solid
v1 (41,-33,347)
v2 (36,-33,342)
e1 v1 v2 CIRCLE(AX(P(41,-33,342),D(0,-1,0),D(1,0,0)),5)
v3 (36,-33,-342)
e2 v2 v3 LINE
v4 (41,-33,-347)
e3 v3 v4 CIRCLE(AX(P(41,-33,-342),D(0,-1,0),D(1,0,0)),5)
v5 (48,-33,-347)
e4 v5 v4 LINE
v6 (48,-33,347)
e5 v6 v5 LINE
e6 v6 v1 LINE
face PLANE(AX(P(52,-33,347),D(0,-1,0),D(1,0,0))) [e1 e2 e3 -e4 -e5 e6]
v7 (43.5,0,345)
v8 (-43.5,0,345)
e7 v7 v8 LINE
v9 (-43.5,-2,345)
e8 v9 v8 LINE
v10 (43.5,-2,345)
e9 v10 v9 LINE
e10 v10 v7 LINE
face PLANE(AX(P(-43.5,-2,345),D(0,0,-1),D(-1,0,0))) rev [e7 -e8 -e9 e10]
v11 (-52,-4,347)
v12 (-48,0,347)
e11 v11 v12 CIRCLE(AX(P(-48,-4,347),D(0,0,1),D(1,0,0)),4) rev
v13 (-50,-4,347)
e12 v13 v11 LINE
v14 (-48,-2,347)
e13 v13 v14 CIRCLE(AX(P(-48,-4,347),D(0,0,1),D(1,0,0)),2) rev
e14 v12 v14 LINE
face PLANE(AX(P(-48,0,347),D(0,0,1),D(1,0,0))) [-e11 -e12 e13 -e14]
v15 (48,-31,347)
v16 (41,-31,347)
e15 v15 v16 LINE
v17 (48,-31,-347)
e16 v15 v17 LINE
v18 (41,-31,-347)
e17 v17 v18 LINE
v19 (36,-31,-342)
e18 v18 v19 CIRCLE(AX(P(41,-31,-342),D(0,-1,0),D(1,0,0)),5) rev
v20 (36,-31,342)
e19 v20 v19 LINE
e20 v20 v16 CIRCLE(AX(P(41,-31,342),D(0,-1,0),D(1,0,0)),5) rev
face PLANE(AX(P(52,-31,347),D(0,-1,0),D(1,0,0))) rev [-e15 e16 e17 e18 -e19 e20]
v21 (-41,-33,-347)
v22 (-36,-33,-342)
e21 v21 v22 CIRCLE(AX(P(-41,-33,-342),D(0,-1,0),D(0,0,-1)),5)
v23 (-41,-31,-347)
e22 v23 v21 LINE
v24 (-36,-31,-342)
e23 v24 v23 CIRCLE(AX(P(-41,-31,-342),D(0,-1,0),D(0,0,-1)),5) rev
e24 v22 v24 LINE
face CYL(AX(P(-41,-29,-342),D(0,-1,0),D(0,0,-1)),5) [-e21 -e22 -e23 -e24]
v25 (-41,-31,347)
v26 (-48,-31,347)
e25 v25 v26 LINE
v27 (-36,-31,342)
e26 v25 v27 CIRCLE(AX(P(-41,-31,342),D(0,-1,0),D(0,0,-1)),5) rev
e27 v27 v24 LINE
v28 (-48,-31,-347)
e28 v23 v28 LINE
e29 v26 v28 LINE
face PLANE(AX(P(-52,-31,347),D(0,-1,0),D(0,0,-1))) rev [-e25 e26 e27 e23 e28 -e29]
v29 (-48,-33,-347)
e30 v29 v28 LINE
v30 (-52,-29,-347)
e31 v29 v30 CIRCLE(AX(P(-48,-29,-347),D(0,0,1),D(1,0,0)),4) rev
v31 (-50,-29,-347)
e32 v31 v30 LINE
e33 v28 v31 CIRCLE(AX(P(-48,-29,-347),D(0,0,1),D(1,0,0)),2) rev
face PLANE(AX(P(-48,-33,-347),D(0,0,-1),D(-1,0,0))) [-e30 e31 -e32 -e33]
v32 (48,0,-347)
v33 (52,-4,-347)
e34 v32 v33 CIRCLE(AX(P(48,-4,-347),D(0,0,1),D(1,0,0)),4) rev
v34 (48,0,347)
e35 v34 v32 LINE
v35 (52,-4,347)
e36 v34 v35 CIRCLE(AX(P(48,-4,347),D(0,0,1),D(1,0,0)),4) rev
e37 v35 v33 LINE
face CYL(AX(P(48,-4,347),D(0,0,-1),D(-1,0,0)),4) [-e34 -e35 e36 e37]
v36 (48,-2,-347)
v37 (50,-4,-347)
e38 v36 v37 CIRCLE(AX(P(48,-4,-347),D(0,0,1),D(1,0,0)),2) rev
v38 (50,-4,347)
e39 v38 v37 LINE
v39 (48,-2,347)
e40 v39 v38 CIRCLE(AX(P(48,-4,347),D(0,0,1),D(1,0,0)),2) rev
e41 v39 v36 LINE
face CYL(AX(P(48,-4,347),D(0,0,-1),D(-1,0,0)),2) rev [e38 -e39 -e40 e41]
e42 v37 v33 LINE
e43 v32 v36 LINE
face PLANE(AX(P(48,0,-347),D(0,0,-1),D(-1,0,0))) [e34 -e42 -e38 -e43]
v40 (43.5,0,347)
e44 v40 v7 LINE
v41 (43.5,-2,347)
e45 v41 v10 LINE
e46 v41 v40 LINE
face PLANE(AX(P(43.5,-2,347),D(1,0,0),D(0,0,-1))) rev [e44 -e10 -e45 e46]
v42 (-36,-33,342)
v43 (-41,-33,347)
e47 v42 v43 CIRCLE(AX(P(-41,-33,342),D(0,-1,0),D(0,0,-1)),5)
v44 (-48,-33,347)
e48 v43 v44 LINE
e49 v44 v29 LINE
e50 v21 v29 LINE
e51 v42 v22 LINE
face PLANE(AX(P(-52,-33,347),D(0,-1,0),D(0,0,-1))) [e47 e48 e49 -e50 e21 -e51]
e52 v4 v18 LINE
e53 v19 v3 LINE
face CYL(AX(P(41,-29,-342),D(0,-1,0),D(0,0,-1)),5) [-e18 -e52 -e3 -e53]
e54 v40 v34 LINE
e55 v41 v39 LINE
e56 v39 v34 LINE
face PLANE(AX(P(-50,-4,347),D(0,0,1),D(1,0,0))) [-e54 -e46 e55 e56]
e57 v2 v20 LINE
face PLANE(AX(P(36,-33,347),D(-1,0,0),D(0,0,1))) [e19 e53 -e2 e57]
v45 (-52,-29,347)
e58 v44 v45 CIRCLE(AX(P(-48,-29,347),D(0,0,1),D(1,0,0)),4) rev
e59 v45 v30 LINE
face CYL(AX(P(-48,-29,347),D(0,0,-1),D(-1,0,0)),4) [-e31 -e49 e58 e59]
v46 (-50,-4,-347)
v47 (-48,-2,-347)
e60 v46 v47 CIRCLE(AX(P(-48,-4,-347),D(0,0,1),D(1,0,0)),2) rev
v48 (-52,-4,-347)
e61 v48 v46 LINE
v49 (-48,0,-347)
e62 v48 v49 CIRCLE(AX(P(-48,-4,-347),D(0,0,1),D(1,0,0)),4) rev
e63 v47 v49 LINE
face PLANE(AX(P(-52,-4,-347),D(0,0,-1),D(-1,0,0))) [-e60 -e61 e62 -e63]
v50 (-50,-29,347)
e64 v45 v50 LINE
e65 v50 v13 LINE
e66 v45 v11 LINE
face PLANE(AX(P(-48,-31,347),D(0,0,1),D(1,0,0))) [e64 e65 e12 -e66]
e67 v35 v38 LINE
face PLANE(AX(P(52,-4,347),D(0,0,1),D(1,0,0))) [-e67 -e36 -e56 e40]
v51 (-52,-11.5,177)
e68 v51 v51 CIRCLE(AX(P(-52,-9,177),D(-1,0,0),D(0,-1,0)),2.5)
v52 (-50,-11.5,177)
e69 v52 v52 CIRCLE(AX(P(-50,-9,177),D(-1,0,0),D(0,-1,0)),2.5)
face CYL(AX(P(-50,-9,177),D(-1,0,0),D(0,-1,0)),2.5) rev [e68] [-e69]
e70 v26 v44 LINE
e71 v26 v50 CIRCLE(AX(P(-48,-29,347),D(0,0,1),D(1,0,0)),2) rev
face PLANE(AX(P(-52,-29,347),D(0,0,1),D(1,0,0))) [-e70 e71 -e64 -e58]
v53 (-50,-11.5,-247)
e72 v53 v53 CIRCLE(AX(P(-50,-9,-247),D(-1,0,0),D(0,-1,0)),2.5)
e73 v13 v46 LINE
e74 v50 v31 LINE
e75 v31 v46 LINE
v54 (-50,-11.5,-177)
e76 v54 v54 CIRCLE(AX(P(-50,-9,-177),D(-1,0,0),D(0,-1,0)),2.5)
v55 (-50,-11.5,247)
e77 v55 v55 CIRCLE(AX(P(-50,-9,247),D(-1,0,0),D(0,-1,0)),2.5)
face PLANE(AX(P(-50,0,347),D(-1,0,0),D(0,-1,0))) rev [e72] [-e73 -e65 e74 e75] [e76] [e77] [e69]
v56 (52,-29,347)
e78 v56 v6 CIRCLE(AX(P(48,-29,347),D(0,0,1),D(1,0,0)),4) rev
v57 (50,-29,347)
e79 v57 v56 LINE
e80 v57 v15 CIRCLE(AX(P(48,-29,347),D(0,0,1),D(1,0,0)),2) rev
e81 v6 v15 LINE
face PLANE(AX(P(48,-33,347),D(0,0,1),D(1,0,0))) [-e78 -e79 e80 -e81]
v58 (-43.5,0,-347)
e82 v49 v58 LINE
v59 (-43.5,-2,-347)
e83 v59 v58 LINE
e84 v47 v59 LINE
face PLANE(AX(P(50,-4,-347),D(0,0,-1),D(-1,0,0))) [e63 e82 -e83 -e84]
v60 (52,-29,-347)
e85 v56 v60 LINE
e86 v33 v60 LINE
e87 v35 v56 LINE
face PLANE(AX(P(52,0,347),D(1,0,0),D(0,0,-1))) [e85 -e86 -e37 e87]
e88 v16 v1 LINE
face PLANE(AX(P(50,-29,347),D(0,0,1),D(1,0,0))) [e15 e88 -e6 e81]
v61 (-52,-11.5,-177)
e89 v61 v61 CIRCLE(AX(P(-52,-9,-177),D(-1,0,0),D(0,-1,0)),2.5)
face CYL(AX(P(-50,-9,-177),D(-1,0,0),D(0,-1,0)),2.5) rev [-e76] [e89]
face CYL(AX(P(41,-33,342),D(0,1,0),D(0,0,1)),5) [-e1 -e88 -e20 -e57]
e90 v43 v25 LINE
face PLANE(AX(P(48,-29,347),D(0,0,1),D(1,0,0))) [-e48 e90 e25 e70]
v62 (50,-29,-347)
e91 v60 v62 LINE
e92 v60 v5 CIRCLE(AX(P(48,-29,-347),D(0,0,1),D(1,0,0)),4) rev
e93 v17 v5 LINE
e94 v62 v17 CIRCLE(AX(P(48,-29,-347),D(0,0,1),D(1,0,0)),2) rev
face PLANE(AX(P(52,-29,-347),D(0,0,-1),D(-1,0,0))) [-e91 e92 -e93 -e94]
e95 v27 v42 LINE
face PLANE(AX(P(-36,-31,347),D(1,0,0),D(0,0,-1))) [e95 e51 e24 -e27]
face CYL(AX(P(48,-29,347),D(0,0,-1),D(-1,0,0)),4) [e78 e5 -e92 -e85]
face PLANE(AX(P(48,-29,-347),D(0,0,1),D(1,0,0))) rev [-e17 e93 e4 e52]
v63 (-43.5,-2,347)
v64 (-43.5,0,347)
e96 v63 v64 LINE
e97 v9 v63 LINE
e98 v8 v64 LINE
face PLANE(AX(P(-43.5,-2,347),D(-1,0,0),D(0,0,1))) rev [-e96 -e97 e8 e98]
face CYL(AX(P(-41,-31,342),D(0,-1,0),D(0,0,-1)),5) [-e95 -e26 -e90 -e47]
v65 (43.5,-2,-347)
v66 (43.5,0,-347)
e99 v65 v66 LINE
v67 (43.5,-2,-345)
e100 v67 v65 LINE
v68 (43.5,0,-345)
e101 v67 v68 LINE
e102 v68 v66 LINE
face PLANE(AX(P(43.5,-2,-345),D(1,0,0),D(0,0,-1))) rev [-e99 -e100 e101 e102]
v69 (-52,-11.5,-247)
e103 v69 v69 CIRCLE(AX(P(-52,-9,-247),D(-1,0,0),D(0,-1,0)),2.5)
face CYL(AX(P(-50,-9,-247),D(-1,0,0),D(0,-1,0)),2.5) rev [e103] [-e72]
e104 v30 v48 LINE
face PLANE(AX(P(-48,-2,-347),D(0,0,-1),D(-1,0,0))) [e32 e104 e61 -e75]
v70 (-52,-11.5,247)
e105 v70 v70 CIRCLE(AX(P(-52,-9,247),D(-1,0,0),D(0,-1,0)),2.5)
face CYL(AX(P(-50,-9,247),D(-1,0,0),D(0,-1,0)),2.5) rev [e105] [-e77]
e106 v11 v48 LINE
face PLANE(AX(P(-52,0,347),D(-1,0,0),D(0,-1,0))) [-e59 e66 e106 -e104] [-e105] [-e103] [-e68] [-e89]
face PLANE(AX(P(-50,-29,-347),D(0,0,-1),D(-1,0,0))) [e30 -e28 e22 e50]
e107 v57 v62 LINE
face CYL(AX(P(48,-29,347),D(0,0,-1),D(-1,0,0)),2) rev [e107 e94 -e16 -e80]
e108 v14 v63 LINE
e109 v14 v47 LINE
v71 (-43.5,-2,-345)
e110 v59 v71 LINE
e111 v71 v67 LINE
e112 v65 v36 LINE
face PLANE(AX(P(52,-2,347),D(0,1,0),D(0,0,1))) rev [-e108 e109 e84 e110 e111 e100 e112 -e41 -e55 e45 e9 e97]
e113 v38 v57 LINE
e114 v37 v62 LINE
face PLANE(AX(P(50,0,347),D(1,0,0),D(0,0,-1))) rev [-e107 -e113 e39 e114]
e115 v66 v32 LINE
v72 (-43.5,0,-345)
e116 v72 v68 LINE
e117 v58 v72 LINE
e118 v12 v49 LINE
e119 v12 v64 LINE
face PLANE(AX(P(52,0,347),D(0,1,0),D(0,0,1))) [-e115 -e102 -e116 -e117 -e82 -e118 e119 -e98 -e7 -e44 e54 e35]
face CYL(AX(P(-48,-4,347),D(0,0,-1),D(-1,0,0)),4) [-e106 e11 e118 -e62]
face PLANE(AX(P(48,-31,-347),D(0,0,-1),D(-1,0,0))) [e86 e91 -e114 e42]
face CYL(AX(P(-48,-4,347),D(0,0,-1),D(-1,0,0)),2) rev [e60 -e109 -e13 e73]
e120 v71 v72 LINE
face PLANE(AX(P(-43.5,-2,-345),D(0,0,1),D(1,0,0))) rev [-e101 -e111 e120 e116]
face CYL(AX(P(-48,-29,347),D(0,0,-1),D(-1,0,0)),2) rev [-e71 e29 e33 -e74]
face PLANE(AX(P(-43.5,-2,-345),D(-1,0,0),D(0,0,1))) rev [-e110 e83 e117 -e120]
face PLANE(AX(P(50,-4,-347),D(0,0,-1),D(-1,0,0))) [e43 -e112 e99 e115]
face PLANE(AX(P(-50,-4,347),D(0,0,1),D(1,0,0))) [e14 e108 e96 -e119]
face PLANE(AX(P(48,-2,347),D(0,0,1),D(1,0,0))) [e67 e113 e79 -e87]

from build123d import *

# Parameters (mm, degrees)
BASE_FLANGE1_DEPTH = 347
SKETCH4_W          = 87
SKETCH4_H          = 2
CUT_EXTRUDE1_DEPTH = 10
SKETCH8_R          = 2.5
CUT_EXTRUDE5_DEPTH = 10
LPATTERN4_COUNT    = 2
LPATTERN4_PITCH    = 424
FILLET1_R          = 5


# Sheet-metal steps are written as plain solids
with BuildPart() as part:
    # Sketch3 → Base-Flange1 (new, symmetric)
    with BuildSketch(Plane.XY):
        with BuildLine():
            Line((36, -33), (48, -33))
            ThreePointArc((48, -33), (50.828427125, -31.828427125), (52, -29))
            Line((52, -29), (52, -4))
            ThreePointArc((52, -4), (50.828427125, -1.171572875), (48, 0))
            Line((48, 0), (-48, 0))
            ThreePointArc((-48, 0), (-50.828427125, -1.171572875), (-52, -4))
            Line((-52, -4), (-52, -29))
            ThreePointArc((-52, -29), (-50.828427125, -31.828427125), (-48, -33))
            Line((-48, -33), (-36, -33))
            Line((-36, -33), (-36, -31))
            Line((-36, -31), (-48, -31))
            ThreePointArc((-48, -31), (-49.414213562, -30.414213562), (-50, -29))
            Line((-50, -29), (-50, -4))
            ThreePointArc((-50, -4), (-49.414213562, -2.585786438), (-48, -2))
            Line((-48, -2), (48, -2))
            ThreePointArc((48, -2), (49.414213562, -2.585786438), (50, -4))
            Line((50, -4), (50, -29))
            ThreePointArc((50, -29), (49.414213562, -30.414213562), (48, -31))
            Line((48, -31), (36, -31))
            Line((36, -31), (36, -33))
        make_face()
    extrude(amount=BASE_FLANGE1_DEPTH, both=True)

    # Sketch4 → Cut-Extrude1 (cut)
    with BuildSketch(Plane(origin=(0, 0, 0), x_dir=(1, 0, 0), z_dir=(0, 1, 0))):
        with Locations((0, -346)):
            Rectangle(SKETCH4_W, SKETCH4_H)
        with Locations((0, 346)):
            Rectangle(SKETCH4_W, SKETCH4_H)
    extrude(amount=-CUT_EXTRUDE1_DEPTH, mode=Mode.SUBTRACT)

    # Sketch8 → Cut-Extrude5 (cut)
    with BuildSketch(Plane.ZY.offset(52)):
        with Locations(Location((177, -9, 0), (0, 0, 270))):
            Circle(SKETCH8_R)
        with Locations(Location((247, -9, 0), (0, 0, 270))):
            Circle(SKETCH8_R)
    cut_extrude5 = extrude(amount=-CUT_EXTRUDE5_DEPTH, mode=Mode.SUBTRACT)

    # LPattern4: Cut-Extrude5 ×2
    with Locations(*[(0, 0, -i * LPATTERN4_PITCH) for i in range(1, LPATTERN4_COUNT)]):
        add(cut_extrude5, mode=Mode.SUBTRACT)

    # Fillet1
    fillet1_edges = [part.edges().sort_by_distance(p)[0] for p in [
        (-36, -32, -347),
        (36, -32, -347),
        (-36, -32, 347),
        (36, -32, 347),
    ]]
    fillet(fillet1_edges, radius=FILLET1_R)


solid = part.part
